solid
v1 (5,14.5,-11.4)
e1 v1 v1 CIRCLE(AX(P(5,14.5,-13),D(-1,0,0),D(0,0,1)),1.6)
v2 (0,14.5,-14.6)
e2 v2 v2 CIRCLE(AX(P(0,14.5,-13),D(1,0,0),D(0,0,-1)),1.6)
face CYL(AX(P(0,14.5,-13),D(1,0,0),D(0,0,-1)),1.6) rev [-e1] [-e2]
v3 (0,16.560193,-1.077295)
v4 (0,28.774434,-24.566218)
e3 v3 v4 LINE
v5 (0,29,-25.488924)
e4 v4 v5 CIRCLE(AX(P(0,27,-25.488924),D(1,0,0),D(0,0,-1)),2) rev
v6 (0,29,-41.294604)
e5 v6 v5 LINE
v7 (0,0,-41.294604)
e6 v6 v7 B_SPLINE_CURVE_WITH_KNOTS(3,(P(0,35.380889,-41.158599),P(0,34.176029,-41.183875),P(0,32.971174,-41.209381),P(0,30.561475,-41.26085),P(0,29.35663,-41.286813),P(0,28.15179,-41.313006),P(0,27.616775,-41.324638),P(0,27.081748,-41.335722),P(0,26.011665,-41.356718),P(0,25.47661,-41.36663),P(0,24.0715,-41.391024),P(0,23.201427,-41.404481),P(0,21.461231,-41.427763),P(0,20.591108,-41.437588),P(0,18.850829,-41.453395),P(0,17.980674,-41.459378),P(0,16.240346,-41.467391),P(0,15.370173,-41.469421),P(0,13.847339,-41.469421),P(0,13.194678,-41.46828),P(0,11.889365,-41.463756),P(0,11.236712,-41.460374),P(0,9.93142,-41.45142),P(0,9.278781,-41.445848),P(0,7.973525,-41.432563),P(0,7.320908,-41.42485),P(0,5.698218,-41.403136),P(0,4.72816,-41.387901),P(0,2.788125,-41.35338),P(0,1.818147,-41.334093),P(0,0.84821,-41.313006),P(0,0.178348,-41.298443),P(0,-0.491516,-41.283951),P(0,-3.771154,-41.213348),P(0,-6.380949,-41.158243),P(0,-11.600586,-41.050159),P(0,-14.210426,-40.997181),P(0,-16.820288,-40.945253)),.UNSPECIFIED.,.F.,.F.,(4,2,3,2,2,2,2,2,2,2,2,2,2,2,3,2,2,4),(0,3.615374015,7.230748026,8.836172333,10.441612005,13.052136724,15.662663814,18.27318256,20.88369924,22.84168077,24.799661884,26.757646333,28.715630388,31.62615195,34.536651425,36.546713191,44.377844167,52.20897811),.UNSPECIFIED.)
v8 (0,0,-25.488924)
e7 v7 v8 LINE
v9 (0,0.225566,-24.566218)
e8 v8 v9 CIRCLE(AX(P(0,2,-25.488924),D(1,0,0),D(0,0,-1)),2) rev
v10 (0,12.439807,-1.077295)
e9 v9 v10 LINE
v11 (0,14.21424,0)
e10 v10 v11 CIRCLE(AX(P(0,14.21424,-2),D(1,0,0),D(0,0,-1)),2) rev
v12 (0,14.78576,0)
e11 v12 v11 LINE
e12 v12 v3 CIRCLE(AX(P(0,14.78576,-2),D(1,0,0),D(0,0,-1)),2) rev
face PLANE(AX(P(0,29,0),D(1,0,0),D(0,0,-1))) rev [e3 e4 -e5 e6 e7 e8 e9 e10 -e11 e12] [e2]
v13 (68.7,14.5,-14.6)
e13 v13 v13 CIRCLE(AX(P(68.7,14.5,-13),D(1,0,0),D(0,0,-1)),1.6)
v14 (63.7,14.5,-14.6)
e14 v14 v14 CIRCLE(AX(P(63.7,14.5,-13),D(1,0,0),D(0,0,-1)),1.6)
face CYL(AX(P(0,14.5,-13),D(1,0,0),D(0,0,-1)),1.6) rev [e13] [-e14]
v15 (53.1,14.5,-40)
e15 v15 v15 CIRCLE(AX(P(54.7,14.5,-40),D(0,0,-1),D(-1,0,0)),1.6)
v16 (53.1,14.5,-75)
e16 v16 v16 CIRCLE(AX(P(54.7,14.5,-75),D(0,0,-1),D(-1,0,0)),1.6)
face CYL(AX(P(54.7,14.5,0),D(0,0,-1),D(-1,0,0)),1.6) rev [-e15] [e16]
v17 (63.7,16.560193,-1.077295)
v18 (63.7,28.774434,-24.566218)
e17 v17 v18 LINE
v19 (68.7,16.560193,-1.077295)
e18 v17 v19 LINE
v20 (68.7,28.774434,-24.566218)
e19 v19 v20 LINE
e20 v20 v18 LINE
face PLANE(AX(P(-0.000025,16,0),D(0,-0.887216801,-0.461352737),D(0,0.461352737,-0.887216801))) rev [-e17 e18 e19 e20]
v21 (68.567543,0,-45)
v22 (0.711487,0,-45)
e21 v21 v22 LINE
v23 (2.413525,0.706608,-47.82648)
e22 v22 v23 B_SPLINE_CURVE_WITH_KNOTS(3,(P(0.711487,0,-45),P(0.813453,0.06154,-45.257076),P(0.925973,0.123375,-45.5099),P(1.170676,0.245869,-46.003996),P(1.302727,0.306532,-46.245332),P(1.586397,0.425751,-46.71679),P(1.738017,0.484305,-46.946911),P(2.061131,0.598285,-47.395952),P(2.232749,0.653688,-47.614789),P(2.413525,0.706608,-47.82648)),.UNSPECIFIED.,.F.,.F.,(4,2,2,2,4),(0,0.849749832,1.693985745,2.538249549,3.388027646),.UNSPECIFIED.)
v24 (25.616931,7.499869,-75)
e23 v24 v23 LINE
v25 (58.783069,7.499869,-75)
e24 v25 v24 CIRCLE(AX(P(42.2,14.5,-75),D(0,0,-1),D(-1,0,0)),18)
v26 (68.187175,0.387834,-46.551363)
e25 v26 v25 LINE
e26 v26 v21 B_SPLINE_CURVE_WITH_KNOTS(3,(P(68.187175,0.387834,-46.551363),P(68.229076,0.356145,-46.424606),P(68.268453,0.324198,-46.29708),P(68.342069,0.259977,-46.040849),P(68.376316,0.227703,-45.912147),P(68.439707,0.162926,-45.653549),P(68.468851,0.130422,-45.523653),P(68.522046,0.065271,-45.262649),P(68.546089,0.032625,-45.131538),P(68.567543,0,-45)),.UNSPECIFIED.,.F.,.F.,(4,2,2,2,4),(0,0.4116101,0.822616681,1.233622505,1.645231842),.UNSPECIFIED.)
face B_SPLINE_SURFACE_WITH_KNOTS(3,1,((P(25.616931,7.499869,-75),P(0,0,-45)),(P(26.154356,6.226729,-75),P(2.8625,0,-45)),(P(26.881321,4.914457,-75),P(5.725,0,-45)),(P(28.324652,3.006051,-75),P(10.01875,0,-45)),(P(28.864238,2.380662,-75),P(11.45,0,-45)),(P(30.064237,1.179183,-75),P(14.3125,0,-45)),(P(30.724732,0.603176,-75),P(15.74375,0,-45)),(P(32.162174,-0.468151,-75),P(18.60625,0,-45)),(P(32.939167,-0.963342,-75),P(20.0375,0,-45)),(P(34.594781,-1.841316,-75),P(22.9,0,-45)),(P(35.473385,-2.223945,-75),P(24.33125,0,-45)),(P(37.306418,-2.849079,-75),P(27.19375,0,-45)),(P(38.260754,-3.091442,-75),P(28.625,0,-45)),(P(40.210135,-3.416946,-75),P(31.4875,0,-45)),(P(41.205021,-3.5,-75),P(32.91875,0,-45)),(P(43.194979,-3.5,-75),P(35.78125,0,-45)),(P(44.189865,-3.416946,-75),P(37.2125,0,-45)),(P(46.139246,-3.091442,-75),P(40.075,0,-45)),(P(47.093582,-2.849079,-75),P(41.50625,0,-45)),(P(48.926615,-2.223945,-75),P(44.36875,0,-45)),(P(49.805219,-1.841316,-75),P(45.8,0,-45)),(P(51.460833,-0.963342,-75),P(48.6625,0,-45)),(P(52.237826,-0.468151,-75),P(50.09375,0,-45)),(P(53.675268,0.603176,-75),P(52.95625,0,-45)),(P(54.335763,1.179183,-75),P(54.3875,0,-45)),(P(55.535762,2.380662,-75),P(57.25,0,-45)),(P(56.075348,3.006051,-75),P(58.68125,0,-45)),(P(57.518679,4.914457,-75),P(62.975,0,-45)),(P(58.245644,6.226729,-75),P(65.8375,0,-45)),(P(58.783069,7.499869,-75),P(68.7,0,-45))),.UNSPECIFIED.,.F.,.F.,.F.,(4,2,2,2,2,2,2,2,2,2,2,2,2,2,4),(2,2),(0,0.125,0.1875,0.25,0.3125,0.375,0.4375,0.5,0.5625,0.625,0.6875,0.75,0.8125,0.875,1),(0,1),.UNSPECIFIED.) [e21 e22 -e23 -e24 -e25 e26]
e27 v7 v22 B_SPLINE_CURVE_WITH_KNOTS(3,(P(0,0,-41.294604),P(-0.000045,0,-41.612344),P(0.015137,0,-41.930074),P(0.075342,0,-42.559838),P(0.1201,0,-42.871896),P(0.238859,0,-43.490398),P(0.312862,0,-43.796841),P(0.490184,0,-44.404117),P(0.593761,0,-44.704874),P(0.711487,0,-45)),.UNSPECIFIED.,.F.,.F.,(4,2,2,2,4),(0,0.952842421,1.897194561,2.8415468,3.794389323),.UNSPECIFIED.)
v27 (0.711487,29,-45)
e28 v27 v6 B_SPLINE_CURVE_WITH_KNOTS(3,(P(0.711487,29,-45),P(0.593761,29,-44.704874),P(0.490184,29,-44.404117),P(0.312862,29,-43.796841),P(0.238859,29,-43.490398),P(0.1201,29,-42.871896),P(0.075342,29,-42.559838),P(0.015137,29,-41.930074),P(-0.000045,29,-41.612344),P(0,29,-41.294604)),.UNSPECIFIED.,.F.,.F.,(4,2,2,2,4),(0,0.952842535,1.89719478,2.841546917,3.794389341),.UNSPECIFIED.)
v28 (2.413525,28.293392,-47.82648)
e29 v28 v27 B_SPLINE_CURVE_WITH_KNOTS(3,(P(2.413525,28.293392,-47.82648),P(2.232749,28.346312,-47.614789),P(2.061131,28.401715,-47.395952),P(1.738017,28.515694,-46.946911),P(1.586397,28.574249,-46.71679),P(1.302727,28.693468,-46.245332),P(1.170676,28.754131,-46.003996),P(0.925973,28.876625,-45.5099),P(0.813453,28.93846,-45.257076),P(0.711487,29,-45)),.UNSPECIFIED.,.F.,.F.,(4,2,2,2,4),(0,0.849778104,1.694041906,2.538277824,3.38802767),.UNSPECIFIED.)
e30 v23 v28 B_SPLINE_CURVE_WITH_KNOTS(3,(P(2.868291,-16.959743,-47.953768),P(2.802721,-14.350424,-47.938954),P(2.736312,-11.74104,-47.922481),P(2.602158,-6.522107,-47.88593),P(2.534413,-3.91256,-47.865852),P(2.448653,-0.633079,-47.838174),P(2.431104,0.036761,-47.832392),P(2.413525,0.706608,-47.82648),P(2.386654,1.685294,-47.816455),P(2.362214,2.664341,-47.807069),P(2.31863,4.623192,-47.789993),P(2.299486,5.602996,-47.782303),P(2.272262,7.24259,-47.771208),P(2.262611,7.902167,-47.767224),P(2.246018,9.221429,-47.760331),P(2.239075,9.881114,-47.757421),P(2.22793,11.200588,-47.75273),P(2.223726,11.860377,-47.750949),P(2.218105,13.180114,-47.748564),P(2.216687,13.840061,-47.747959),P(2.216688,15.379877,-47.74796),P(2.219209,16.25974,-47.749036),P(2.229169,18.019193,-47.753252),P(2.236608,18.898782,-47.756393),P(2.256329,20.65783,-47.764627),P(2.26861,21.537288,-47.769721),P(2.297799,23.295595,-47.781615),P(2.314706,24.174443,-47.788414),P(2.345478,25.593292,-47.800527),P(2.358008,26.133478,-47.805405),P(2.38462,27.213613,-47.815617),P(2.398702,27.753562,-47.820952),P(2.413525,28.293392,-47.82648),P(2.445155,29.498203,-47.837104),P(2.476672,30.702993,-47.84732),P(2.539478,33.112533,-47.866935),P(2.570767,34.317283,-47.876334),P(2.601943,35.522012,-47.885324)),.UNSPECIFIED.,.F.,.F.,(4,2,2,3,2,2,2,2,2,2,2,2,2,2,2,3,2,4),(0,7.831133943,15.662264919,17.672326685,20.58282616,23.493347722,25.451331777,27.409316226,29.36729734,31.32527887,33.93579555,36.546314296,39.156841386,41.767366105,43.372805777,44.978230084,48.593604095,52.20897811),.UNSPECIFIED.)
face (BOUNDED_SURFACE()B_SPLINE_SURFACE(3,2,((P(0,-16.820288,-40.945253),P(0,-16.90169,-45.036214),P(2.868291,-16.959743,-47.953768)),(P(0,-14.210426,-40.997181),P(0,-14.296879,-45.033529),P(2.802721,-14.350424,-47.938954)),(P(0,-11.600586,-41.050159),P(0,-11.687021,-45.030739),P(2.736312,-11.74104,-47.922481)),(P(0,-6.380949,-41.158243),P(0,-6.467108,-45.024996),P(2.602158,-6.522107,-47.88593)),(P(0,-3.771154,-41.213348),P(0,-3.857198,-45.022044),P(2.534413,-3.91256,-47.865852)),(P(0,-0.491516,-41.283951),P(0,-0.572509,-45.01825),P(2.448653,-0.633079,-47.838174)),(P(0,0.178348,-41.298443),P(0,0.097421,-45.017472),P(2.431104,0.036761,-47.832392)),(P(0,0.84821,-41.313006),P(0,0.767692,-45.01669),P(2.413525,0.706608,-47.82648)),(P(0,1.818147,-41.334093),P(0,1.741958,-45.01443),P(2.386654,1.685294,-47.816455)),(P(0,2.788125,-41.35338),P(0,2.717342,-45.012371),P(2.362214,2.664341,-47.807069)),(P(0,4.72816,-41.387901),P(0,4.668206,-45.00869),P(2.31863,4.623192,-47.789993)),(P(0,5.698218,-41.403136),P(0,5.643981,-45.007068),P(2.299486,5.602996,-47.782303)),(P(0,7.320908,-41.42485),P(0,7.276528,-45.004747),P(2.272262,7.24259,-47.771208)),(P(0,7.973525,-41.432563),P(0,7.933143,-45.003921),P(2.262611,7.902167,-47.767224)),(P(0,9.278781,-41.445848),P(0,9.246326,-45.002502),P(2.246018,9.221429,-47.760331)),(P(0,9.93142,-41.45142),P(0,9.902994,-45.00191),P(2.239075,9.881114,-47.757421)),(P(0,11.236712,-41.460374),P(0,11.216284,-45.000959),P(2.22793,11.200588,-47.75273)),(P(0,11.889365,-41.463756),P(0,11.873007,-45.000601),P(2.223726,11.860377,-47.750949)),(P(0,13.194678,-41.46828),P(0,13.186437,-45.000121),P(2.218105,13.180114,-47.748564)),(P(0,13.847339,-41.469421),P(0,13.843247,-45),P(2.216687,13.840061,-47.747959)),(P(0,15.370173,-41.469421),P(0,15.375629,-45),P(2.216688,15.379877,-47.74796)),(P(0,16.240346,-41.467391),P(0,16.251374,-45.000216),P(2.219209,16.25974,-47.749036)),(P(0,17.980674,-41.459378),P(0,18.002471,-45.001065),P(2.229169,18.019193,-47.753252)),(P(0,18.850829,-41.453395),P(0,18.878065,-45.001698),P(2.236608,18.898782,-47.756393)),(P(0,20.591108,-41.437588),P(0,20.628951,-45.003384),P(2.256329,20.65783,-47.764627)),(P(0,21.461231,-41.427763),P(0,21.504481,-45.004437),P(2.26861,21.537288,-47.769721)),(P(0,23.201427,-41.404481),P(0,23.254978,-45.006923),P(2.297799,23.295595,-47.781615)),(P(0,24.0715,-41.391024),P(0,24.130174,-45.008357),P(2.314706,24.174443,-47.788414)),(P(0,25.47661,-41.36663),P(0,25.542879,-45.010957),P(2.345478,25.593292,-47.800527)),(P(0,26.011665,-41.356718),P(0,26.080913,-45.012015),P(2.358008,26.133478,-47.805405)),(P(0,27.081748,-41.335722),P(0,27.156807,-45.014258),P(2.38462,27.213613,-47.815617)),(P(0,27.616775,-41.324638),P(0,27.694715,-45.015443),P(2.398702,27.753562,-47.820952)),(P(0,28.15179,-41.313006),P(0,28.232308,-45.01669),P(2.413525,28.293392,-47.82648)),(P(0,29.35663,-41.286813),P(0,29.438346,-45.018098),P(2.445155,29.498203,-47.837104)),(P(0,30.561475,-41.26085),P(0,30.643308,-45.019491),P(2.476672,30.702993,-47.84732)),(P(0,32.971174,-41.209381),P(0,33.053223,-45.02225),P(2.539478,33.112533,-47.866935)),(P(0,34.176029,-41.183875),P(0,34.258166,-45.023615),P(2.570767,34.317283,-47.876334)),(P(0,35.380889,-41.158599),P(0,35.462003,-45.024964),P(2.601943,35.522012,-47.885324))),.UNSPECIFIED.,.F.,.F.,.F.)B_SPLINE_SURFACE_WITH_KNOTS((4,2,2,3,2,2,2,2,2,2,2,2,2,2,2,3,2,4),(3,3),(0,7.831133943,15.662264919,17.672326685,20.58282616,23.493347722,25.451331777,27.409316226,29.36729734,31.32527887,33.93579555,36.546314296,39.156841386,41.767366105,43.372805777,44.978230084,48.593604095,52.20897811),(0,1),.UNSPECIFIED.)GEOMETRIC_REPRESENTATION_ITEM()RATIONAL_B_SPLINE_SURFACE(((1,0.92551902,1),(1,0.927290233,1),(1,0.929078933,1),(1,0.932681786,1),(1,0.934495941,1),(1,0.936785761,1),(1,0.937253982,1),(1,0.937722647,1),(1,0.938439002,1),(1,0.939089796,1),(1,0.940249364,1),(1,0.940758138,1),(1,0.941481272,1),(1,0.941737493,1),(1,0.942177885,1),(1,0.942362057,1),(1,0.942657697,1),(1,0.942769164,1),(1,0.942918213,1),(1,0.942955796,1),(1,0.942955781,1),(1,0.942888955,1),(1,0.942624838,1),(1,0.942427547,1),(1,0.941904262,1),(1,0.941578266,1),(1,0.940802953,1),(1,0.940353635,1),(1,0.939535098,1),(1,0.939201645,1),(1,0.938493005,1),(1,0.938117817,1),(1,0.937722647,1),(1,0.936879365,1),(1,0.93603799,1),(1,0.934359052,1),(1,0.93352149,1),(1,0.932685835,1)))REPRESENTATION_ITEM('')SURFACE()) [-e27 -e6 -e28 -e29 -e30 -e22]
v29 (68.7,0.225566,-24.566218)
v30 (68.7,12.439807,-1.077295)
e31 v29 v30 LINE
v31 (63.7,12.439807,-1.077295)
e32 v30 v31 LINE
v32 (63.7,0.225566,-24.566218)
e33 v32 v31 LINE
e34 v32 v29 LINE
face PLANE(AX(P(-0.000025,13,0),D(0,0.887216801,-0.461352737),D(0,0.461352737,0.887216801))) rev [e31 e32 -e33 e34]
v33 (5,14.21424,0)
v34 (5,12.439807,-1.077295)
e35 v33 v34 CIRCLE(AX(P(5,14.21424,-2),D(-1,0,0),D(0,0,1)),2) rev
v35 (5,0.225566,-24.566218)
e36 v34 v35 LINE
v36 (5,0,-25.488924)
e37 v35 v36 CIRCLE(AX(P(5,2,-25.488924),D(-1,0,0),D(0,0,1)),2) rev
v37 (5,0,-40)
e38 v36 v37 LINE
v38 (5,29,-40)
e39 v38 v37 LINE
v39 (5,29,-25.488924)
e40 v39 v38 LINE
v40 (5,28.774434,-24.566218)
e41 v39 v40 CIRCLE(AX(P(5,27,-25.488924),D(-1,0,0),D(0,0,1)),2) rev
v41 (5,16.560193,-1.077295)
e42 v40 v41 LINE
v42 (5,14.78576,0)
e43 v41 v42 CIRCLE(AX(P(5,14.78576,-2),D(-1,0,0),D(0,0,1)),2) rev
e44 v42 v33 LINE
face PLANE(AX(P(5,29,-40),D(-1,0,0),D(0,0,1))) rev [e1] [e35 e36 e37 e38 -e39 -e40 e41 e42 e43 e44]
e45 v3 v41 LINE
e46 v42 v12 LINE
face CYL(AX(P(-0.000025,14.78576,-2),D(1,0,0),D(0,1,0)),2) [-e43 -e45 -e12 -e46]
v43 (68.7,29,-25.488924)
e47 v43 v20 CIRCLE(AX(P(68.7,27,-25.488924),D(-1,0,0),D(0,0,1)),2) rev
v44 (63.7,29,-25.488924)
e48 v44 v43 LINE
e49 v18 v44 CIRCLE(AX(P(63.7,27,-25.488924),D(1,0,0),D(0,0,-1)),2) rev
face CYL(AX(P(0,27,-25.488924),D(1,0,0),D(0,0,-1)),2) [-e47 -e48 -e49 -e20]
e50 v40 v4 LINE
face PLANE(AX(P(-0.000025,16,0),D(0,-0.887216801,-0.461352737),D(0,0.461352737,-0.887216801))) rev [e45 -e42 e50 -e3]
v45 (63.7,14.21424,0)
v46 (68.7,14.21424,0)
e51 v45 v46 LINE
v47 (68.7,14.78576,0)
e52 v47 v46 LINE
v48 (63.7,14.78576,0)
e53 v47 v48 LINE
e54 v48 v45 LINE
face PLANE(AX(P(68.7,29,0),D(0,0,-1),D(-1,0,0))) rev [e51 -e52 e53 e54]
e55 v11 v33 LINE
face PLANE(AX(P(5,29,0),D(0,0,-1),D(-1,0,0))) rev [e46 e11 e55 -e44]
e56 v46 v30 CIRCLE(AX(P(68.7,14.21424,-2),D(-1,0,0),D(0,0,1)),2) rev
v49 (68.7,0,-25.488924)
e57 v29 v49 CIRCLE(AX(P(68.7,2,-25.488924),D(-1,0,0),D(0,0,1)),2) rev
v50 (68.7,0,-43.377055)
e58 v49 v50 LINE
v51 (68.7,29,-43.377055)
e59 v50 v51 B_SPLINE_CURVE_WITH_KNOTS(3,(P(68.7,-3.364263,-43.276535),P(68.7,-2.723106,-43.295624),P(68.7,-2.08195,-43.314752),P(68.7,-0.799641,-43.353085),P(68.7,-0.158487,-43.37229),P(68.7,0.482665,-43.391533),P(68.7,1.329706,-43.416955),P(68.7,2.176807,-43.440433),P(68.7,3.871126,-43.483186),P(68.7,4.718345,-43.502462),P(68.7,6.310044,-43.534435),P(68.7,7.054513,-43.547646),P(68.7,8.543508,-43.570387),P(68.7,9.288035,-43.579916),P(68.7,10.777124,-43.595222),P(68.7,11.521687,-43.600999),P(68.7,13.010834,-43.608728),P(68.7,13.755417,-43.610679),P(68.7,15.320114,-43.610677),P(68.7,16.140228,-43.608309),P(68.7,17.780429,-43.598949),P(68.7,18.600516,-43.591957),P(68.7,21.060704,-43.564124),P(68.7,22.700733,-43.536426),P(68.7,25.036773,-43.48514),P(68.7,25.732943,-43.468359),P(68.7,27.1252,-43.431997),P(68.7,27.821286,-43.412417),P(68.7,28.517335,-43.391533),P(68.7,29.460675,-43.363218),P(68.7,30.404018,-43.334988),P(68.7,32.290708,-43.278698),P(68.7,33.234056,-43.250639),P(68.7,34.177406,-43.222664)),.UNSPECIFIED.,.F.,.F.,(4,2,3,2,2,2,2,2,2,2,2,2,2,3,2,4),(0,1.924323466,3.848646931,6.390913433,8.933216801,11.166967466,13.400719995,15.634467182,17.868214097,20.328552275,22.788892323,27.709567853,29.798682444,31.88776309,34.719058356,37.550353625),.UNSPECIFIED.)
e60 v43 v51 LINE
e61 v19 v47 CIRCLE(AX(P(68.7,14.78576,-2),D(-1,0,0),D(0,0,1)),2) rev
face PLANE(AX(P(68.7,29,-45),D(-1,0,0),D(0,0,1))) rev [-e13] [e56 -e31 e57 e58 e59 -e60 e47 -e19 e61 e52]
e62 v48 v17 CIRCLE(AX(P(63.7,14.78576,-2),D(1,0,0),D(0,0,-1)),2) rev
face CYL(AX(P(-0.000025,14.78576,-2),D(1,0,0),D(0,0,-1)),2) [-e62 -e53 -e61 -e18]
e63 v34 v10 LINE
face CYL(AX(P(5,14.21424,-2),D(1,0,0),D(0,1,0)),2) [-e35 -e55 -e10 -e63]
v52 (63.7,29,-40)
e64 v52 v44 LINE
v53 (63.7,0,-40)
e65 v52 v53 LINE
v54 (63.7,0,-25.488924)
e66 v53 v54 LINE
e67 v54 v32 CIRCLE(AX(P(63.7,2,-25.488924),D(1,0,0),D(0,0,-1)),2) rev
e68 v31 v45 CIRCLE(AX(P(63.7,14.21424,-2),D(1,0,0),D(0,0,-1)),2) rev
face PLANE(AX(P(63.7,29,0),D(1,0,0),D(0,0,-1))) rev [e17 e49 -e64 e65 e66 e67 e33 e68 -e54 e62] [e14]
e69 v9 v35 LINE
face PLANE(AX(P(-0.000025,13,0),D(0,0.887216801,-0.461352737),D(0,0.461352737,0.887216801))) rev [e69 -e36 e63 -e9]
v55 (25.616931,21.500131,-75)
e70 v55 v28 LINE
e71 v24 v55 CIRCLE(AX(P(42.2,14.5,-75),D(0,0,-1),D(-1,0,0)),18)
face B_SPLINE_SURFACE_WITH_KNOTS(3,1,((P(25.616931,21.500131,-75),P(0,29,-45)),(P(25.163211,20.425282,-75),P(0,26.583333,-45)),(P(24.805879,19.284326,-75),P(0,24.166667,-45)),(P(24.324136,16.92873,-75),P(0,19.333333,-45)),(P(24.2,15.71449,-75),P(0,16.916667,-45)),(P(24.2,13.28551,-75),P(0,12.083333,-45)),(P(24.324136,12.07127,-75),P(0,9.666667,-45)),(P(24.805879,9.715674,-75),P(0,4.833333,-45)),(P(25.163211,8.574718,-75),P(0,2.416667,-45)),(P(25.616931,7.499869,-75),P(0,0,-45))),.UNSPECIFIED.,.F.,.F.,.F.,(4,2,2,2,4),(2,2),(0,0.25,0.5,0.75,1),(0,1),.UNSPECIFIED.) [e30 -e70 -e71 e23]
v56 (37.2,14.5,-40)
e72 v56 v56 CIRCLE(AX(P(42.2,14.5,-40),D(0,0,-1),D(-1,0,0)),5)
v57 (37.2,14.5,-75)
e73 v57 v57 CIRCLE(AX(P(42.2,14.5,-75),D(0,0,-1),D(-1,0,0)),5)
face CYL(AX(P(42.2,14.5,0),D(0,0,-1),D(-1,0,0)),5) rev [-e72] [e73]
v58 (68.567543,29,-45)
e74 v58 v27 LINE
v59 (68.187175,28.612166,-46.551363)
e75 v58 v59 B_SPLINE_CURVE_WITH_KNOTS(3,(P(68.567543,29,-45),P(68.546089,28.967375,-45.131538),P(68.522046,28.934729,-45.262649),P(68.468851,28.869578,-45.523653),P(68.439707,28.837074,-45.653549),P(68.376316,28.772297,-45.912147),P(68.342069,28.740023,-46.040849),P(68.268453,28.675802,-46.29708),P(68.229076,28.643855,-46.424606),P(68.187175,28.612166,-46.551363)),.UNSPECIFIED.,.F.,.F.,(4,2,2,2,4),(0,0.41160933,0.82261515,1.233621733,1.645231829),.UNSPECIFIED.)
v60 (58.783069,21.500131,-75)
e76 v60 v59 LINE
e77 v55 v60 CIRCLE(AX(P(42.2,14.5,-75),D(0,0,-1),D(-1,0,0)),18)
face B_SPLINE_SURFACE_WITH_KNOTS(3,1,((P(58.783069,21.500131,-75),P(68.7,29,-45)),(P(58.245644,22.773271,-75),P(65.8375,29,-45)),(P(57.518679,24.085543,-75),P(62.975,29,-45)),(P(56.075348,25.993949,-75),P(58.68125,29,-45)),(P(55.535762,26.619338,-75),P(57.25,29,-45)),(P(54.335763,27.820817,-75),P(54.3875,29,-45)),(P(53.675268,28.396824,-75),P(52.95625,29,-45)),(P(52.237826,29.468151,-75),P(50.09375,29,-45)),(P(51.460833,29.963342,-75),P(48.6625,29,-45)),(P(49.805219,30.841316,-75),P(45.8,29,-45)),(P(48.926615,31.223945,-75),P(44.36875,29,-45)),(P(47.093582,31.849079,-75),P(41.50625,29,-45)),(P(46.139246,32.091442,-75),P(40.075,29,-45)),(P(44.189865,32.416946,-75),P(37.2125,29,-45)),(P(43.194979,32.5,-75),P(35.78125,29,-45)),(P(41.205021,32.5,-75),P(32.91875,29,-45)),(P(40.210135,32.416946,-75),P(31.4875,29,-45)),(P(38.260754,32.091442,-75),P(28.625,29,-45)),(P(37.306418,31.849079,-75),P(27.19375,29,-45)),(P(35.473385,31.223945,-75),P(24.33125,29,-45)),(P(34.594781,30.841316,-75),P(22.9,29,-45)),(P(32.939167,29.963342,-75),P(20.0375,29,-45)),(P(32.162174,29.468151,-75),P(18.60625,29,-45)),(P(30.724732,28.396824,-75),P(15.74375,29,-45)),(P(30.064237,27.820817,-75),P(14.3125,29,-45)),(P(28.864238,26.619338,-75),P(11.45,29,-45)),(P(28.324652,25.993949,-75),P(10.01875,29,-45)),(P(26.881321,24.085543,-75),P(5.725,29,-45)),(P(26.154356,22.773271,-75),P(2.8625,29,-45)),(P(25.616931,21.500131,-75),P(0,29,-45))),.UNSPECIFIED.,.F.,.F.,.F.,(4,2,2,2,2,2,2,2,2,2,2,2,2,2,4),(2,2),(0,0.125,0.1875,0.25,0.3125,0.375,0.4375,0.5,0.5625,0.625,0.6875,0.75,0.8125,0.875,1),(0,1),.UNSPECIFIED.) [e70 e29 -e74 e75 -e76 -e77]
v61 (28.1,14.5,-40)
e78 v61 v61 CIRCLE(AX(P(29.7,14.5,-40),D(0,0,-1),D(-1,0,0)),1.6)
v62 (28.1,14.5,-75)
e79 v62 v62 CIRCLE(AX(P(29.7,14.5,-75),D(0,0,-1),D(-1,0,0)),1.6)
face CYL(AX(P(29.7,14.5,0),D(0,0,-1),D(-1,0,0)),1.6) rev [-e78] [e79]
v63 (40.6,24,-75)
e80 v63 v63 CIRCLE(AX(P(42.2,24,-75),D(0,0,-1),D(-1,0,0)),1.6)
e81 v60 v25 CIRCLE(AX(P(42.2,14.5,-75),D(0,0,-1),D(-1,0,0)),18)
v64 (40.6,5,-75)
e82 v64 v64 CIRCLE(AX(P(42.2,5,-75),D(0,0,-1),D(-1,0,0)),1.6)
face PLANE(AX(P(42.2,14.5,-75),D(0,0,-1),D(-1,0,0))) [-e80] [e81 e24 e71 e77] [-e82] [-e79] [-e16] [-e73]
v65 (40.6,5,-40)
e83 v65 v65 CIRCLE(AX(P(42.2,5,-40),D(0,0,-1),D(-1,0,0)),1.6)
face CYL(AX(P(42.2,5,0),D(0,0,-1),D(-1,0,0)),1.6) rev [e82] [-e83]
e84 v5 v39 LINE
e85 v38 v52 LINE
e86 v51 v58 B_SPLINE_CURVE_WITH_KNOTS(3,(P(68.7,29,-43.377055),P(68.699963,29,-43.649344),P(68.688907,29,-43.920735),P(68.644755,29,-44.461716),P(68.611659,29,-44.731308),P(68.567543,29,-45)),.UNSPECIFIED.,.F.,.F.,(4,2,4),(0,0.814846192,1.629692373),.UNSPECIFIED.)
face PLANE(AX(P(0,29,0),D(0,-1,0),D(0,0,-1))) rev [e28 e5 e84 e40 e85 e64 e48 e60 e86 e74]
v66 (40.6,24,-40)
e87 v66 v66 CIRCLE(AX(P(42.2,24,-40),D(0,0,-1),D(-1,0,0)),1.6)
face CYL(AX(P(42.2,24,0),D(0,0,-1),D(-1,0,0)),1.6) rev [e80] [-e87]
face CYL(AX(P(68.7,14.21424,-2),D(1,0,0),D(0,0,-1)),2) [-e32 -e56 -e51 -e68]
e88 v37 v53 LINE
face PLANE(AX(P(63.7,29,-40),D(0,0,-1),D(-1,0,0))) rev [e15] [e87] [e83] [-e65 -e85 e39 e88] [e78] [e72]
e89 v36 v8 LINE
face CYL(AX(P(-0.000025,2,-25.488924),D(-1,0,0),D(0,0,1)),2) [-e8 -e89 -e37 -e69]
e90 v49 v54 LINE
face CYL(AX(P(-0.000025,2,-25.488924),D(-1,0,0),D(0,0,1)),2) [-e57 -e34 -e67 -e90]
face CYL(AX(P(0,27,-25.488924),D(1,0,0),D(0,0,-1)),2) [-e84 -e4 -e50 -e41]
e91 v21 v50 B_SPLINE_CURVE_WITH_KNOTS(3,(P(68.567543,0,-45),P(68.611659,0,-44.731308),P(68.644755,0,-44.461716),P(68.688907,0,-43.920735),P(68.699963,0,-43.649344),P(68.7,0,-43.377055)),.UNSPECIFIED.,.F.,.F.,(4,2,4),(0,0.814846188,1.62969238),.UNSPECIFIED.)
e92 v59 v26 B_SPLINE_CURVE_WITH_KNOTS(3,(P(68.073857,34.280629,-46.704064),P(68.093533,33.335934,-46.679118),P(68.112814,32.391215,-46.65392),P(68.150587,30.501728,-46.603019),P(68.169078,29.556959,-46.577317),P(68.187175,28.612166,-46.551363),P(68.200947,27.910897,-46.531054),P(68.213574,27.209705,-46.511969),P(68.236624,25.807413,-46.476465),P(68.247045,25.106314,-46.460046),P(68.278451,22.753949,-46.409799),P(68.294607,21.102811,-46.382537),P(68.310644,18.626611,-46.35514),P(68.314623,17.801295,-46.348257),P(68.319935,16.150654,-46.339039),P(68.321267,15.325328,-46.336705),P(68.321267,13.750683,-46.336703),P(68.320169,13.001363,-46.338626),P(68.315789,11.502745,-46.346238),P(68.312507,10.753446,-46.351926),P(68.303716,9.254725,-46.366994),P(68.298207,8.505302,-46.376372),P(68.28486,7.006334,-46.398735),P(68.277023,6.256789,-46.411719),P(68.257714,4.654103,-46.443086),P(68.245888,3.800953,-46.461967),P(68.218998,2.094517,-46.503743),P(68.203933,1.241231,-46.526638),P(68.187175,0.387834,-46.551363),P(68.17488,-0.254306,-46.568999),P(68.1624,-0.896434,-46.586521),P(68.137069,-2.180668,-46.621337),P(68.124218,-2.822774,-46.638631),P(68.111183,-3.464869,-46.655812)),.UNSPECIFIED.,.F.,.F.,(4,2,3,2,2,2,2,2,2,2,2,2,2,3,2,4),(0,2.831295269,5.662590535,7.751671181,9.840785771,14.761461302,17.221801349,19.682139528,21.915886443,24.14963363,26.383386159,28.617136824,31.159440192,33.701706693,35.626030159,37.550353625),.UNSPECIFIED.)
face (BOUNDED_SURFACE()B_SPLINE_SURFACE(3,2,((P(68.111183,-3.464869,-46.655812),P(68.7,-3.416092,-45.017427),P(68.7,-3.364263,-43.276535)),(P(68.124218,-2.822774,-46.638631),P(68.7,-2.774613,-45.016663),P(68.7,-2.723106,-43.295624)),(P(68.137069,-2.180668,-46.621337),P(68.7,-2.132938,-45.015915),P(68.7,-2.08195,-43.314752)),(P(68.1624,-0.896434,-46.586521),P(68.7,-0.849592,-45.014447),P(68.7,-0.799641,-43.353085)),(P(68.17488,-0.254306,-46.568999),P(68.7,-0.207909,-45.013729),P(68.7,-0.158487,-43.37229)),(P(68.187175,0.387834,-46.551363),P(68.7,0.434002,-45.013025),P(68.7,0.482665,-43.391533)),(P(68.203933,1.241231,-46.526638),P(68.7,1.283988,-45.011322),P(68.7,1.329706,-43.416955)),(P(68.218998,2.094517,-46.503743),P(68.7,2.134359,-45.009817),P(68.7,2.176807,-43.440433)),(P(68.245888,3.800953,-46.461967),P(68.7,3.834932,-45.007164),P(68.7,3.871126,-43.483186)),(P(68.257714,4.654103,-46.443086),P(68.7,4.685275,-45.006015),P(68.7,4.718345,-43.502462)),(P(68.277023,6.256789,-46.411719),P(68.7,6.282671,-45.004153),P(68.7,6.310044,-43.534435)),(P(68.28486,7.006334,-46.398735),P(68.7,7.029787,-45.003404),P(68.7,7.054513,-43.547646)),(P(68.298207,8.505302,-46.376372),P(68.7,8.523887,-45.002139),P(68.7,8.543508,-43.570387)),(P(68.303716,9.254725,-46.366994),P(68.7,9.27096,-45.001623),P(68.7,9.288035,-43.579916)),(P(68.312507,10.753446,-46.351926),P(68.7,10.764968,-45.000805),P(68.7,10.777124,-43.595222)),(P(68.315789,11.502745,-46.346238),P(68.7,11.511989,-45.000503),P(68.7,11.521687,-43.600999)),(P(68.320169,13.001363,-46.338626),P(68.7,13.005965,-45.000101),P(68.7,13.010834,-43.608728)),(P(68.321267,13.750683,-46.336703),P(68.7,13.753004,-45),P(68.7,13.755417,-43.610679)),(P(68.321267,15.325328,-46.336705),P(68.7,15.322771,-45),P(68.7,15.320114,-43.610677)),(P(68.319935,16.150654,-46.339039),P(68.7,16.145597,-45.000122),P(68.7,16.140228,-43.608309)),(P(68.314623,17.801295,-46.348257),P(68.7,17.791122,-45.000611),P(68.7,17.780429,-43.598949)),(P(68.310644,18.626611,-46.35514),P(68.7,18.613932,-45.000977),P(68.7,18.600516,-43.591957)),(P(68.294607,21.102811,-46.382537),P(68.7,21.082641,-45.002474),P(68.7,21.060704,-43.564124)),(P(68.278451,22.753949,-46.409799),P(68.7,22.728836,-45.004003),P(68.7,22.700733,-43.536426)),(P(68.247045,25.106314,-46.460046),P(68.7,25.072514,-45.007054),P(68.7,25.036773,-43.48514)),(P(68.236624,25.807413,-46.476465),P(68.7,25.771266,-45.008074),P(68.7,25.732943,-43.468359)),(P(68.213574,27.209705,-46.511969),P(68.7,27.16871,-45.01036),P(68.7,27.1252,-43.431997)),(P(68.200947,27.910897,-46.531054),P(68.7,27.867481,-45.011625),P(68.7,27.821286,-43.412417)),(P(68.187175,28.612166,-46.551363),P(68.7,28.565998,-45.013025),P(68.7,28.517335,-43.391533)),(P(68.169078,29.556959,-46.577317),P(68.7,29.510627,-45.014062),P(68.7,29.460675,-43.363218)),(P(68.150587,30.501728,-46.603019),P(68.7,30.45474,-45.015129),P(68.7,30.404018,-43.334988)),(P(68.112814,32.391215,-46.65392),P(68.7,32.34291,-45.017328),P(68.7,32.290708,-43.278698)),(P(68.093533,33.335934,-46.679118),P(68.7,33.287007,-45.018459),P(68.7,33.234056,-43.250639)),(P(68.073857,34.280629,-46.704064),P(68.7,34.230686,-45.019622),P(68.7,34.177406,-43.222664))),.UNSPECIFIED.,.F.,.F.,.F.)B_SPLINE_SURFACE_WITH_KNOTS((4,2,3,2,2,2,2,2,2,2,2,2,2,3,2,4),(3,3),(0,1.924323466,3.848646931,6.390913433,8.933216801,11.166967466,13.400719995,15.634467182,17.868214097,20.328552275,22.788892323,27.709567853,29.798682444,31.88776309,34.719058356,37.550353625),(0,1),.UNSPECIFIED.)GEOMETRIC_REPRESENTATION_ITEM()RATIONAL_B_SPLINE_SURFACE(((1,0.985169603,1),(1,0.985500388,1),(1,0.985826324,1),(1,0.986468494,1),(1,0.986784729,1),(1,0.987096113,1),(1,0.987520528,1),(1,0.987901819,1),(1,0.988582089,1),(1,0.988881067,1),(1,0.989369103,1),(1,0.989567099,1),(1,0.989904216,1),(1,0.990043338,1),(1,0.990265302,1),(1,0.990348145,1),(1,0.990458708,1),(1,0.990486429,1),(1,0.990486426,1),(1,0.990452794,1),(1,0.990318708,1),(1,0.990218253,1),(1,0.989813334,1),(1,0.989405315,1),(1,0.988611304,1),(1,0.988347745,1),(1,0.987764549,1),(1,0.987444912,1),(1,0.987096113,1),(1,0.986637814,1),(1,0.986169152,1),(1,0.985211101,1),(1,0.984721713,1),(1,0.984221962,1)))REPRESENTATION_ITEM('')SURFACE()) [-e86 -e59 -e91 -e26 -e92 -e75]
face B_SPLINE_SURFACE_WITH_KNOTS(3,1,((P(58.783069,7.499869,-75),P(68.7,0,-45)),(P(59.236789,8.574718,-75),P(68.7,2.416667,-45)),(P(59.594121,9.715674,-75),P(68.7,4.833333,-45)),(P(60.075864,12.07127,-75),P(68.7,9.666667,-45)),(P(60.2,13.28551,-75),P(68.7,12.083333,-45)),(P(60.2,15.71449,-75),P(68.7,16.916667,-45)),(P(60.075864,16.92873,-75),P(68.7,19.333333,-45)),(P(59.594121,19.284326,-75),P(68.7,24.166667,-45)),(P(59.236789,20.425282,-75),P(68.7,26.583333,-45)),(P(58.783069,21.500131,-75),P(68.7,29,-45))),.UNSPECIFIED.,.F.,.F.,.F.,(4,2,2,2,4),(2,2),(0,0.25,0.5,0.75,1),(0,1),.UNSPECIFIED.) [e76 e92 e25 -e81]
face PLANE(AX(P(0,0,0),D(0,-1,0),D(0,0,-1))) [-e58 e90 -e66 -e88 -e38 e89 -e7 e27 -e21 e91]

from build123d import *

# Parameters (mm, degrees)
BOSS_EXTRUDE1_DEPTH = 29
SKETCH2_R           = 1.6
CUT_EXTRUDE1_DEPTH  = 88.095866722
SKETCH8_R           = 5
SKETCH8_R_2         = 1.6
CUT_EXTRUDE3_DEPTH  = 107.775184478
CUT_EXTRUDE4_DEPTH  = 107.775184548
FILLET1_R           = 2
FILLET2_R           = 10


with BuildPart() as part:
    # Sketch1 → Boss-Extrude1 (new body)
    with BuildSketch(Plane(origin=(0, 0, 0), x_dir=(1, 0, 0), z_dir=(0, 1, 0))):
        Polygon((0, 0), (0, 45), (68.7, 45), (68.7, 0), (63.7, 0), (63.7, 40), (5, 40), (5, 0), align=None)
    extrude(amount=BOSS_EXTRUDE1_DEPTH)

    # Sketch2 → Cut-Extrude1 (cut, through all)
    with BuildSketch(Plane(origin=(68.7, 0, 0), x_dir=(0, 0, -1), z_dir=(1, 0, 0))):
        with Locations((13, 14.5)):
            Circle(SKETCH2_R)
    extrude(amount=-CUT_EXTRUDE1_DEPTH, mode=Mode.SUBTRACT)

    # Loft2: read off the stored shape, not the designer's step
    # Loft2: loft between two sections, ruled curve by curve
    loft2_from = [
        Edge.make_bspline([(58.7830687, 7.499869108, -75), (59.236789371, 8.574717733, -75), (59.594121179, 9.715673973, -75), (60.075863556, 12.071270035, -75), (60.2, 13.285510166, -75), (60.2, 15.714489834, -75), (60.075863556, 16.928729965, -75), (59.594121179, 19.284326027, -75), (59.236789371, 20.425282267, -75), (58.7830687, 21.500130892, -75)], [0, 0, 0, 0, 0.25, 0.25, 0.5, 0.5, 0.75, 0.75, 1, 1, 1, 1], 3),
        Edge.make_bspline([(58.7830687, 21.500130892, -75), (58.245644387, 22.773270556, -75), (57.518678604, 24.085542636, -75), (56.075347645, 25.993948982, -75), (55.535761632, 26.619337811, -75), (54.335762543, 27.820816595, -75), (53.675268026, 28.396824058, -75), (52.237826073, 29.468150951, -75), (51.460832799, 29.963342143, -75), (49.805218581, 30.841316492, -75), (48.926615313, 31.223945338, -75), (47.093581696, 31.849079498, -75), (46.13924648, 32.091442444, -75), (44.189865052, 32.41694581, -75), (43.194978913, 32.5, -75), (41.205021087, 32.5, -75), (40.210134948, 32.41694581, -75), (38.26075352, 32.091442444, -75), (37.306418304, 31.849079498, -75), (35.473384687, 31.223945338, -75), (34.594781419, 30.841316492, -75), (32.939167201, 29.963342143, -75), (32.162173927, 29.468150951, -75), (30.724731974, 28.396824058, -75), (30.064237457, 27.820816595, -75), (28.864238368, 26.619337811, -75), (28.324652355, 25.993948982, -75), (26.881321396, 24.085542636, -75), (26.154355613, 22.773270556, -75), (25.6169313, 21.500130892, -75)], [0, 0, 0, 0, 0.125, 0.125, 0.1875, 0.1875, 0.25, 0.25, 0.3125, 0.3125, 0.375, 0.375, 0.4375, 0.4375, 0.5, 0.5, 0.5625, 0.5625, 0.625, 0.625, 0.6875, 0.6875, 0.75, 0.75, 0.8125, 0.8125, 0.875, 0.875, 1, 1, 1, 1], 3),
        Edge.make_bspline([(25.6169313, 7.499869108, -75), (26.154355613, 6.226729444, -75), (26.881321396, 4.914457364, -75), (28.324652355, 3.006051018, -75), (28.864238368, 2.380662189, -75), (30.064237457, 1.179183405, -75), (30.724731974, 0.603175942, -75), (32.162173927, -0.468150951, -75), (32.939167201, -0.963342143, -75), (34.594781419, -1.841316492, -75), (35.473384687, -2.223945338, -75), (37.306418304, -2.849079498, -75), (38.26075352, -3.091442444, -75), (40.210134948, -3.41694581, -75), (41.205021087, -3.5, -75), (43.194978913, -3.5, -75), (44.189865052, -3.41694581, -75), (46.13924648, -3.091442444, -75), (47.093581696, -2.849079498, -75), (48.926615313, -2.223945338, -75), (49.805218581, -1.841316492, -75), (51.460832799, -0.963342143, -75), (52.237826073, -0.468150951, -75), (53.675268026, 0.603175942, -75), (54.335762543, 1.179183405, -75), (55.535761632, 2.380662189, -75), (56.075347645, 3.006051018, -75), (57.518678604, 4.914457364, -75), (58.245644387, 6.226729444, -75), (58.7830687, 7.499869108, -75)], [0, 0, 0, 0, 0.125, 0.125, 0.1875, 0.1875, 0.25, 0.25, 0.3125, 0.3125, 0.375, 0.375, 0.4375, 0.4375, 0.5, 0.5, 0.5625, 0.5625, 0.625, 0.625, 0.6875, 0.6875, 0.75, 0.75, 0.8125, 0.8125, 0.875, 0.875, 1, 1, 1, 1], 3),
        Edge.make_bspline([(25.6169313, 21.500130892, -75), (25.163210629, 20.425282267, -75), (24.805878821, 19.284326027, -75), (24.324136444, 16.928729965, -75), (24.2, 15.714489834, -75), (24.2, 13.285510166, -75), (24.324136444, 12.071270035, -75), (24.805878821, 9.715673973, -75), (25.163210629, 8.574717733, -75), (25.6169313, 7.499869108, -75)], [0, 0, 0, 0, 0.25, 0.25, 0.5, 0.5, 0.75, 0.75, 1, 1, 1, 1], 3),
    ]
    loft2_to = [
        Edge.make_bspline([(68.7, 0, -45), (68.7, 2.416666667, -45), (68.7, 4.833333333, -45), (68.7, 9.666666667, -45), (68.7, 12.083333333, -45), (68.7, 16.916666667, -45), (68.7, 19.333333333, -45), (68.7, 24.166666667, -45), (68.7, 26.583333333, -45), (68.7, 29, -45)], [0, 0, 0, 0, 0.25, 0.25, 0.5, 0.5, 0.75, 0.75, 1, 1, 1, 1], 3),
        Edge.make_bspline([(68.7, 29, -45), (65.8375, 29, -45), (62.975, 29, -45), (58.68125, 29, -45), (57.25, 29, -45), (54.3875, 29, -45), (52.95625, 29, -45), (50.09375, 29, -45), (48.6625, 29, -45), (45.8, 29, -45), (44.36875, 29, -45), (41.50625, 29, -45), (40.075, 29, -45), (37.2125, 29, -45), (35.78125, 29, -45), (32.91875, 29, -45), (31.4875, 29, -45), (28.625, 29, -45), (27.19375, 29, -45), (24.33125, 29, -45), (22.9, 29, -45), (20.0375, 29, -45), (18.60625, 29, -45), (15.74375, 29, -45), (14.3125, 29, -45), (11.45, 29, -45), (10.01875, 29, -45), (5.725, 29, -45), (2.8625, 29, -45), (0, 29, -45)], [0, 0, 0, 0, 0.125, 0.125, 0.1875, 0.1875, 0.25, 0.25, 0.3125, 0.3125, 0.375, 0.375, 0.4375, 0.4375, 0.5, 0.5, 0.5625, 0.5625, 0.625, 0.625, 0.6875, 0.6875, 0.75, 0.75, 0.8125, 0.8125, 0.875, 0.875, 1, 1, 1, 1], 3),
        Edge.make_bspline([(0, 0, -45), (2.8625, 0, -45), (5.725, 0, -45), (10.01875, 0, -45), (11.45, 0, -45), (14.3125, 0, -45), (15.74375, 0, -45), (18.60625, 0, -45), (20.0375, 0, -45), (22.9, 0, -45), (24.33125, 0, -45), (27.19375, 0, -45), (28.625, 0, -45), (31.4875, 0, -45), (32.91875, 0, -45), (35.78125, 0, -45), (37.2125, 0, -45), (40.075, 0, -45), (41.50625, 0, -45), (44.36875, 0, -45), (45.8, 0, -45), (48.6625, 0, -45), (50.09375, 0, -45), (52.95625, 0, -45), (54.3875, 0, -45), (57.25, 0, -45), (58.68125, 0, -45), (62.975, 0, -45), (65.8375, 0, -45), (68.7, 0, -45)], [0, 0, 0, 0, 0.125, 0.125, 0.1875, 0.1875, 0.25, 0.25, 0.3125, 0.3125, 0.375, 0.375, 0.4375, 0.4375, 0.5, 0.5, 0.5625, 0.5625, 0.625, 0.625, 0.6875, 0.6875, 0.75, 0.75, 0.8125, 0.8125, 0.875, 0.875, 1, 1, 1, 1], 3),
        Edge.make_bspline([(0, 29, -45), (0, 26.583333333, -45), (0, 24.166666667, -45), (0, 19.333333333, -45), (0, 16.916666667, -45), (0, 12.083333333, -45), (0, 9.666666667, -45), (0, 4.833333333, -45), (0, 2.416666667, -45), (0, 0, -45)], [0, 0, 0, 0, 0.25, 0.25, 0.5, 0.5, 0.75, 0.75, 1, 1, 1, 1], 3),
    ]
    loft2 = Solid(Shell([*[Face.make_surface_from_curves(loft2_from[k], loft2_to[k]) for k in range(4)], Face(Wire(loft2_from)), Face(Wire(loft2_to))]))
    add(loft2)

    # Sketch8 → Cut-Extrude3 (cut, through all)
    with BuildSketch(Plane(origin=(0, 0, -75), x_dir=(-1, 0, 0), z_dir=(0, 0, -1))):
        with Locations((-42.2, 14.5)):
            Circle(SKETCH8_R)
        with Locations((-42.2, 24)):
            Circle(SKETCH8_R_2)
        with Locations((-29.7, 14.5)):
            Circle(SKETCH8_R_2)
        with Locations((-42.2, 5)):
            Circle(SKETCH8_R_2)
        with Locations((-54.7, 14.5)):
            Circle(SKETCH8_R_2)
    extrude(amount=-CUT_EXTRUDE3_DEPTH, mode=Mode.SUBTRACT)

    # Sketch9 → Cut-Extrude4 (cut, through all)
    with BuildSketch(Plane(origin=(68.7, 0, 0), x_dir=(0, 0, -1), z_dir=(1, 0, 0))):
        Polygon((0, 13), (25, 0), (0, 0), align=None)
        Polygon((0, 16), (25, 29), (0, 29), align=None)
    extrude(amount=-CUT_EXTRUDE4_DEPTH, mode=Mode.SUBTRACT)

    # Fillet1
    fillet1_edges = [part.edges().sort_by_distance(p)[0] for p in [
        (2.5, 16, 0),
        (66.2, 16, 0),
        (66.2, 0, -25),
        (2.5, 0, -25),
        (66.2, 29, -25),
        (2.5, 29, -25),
        (2.5, 13, 0),
        (66.2, 13, 0),
    ]]
    fillet(fillet1_edges, radius=FILLET1_R)

    # Fillet2
    fillet2_edges = [part.edges().sort_by_distance(p)[0] for p in [
        (68.7, 14.5, -45),
        (0, 14.5, -45),
    ]]
    fillet(fillet2_edges, radius=FILLET2_R)


solid = part.part
